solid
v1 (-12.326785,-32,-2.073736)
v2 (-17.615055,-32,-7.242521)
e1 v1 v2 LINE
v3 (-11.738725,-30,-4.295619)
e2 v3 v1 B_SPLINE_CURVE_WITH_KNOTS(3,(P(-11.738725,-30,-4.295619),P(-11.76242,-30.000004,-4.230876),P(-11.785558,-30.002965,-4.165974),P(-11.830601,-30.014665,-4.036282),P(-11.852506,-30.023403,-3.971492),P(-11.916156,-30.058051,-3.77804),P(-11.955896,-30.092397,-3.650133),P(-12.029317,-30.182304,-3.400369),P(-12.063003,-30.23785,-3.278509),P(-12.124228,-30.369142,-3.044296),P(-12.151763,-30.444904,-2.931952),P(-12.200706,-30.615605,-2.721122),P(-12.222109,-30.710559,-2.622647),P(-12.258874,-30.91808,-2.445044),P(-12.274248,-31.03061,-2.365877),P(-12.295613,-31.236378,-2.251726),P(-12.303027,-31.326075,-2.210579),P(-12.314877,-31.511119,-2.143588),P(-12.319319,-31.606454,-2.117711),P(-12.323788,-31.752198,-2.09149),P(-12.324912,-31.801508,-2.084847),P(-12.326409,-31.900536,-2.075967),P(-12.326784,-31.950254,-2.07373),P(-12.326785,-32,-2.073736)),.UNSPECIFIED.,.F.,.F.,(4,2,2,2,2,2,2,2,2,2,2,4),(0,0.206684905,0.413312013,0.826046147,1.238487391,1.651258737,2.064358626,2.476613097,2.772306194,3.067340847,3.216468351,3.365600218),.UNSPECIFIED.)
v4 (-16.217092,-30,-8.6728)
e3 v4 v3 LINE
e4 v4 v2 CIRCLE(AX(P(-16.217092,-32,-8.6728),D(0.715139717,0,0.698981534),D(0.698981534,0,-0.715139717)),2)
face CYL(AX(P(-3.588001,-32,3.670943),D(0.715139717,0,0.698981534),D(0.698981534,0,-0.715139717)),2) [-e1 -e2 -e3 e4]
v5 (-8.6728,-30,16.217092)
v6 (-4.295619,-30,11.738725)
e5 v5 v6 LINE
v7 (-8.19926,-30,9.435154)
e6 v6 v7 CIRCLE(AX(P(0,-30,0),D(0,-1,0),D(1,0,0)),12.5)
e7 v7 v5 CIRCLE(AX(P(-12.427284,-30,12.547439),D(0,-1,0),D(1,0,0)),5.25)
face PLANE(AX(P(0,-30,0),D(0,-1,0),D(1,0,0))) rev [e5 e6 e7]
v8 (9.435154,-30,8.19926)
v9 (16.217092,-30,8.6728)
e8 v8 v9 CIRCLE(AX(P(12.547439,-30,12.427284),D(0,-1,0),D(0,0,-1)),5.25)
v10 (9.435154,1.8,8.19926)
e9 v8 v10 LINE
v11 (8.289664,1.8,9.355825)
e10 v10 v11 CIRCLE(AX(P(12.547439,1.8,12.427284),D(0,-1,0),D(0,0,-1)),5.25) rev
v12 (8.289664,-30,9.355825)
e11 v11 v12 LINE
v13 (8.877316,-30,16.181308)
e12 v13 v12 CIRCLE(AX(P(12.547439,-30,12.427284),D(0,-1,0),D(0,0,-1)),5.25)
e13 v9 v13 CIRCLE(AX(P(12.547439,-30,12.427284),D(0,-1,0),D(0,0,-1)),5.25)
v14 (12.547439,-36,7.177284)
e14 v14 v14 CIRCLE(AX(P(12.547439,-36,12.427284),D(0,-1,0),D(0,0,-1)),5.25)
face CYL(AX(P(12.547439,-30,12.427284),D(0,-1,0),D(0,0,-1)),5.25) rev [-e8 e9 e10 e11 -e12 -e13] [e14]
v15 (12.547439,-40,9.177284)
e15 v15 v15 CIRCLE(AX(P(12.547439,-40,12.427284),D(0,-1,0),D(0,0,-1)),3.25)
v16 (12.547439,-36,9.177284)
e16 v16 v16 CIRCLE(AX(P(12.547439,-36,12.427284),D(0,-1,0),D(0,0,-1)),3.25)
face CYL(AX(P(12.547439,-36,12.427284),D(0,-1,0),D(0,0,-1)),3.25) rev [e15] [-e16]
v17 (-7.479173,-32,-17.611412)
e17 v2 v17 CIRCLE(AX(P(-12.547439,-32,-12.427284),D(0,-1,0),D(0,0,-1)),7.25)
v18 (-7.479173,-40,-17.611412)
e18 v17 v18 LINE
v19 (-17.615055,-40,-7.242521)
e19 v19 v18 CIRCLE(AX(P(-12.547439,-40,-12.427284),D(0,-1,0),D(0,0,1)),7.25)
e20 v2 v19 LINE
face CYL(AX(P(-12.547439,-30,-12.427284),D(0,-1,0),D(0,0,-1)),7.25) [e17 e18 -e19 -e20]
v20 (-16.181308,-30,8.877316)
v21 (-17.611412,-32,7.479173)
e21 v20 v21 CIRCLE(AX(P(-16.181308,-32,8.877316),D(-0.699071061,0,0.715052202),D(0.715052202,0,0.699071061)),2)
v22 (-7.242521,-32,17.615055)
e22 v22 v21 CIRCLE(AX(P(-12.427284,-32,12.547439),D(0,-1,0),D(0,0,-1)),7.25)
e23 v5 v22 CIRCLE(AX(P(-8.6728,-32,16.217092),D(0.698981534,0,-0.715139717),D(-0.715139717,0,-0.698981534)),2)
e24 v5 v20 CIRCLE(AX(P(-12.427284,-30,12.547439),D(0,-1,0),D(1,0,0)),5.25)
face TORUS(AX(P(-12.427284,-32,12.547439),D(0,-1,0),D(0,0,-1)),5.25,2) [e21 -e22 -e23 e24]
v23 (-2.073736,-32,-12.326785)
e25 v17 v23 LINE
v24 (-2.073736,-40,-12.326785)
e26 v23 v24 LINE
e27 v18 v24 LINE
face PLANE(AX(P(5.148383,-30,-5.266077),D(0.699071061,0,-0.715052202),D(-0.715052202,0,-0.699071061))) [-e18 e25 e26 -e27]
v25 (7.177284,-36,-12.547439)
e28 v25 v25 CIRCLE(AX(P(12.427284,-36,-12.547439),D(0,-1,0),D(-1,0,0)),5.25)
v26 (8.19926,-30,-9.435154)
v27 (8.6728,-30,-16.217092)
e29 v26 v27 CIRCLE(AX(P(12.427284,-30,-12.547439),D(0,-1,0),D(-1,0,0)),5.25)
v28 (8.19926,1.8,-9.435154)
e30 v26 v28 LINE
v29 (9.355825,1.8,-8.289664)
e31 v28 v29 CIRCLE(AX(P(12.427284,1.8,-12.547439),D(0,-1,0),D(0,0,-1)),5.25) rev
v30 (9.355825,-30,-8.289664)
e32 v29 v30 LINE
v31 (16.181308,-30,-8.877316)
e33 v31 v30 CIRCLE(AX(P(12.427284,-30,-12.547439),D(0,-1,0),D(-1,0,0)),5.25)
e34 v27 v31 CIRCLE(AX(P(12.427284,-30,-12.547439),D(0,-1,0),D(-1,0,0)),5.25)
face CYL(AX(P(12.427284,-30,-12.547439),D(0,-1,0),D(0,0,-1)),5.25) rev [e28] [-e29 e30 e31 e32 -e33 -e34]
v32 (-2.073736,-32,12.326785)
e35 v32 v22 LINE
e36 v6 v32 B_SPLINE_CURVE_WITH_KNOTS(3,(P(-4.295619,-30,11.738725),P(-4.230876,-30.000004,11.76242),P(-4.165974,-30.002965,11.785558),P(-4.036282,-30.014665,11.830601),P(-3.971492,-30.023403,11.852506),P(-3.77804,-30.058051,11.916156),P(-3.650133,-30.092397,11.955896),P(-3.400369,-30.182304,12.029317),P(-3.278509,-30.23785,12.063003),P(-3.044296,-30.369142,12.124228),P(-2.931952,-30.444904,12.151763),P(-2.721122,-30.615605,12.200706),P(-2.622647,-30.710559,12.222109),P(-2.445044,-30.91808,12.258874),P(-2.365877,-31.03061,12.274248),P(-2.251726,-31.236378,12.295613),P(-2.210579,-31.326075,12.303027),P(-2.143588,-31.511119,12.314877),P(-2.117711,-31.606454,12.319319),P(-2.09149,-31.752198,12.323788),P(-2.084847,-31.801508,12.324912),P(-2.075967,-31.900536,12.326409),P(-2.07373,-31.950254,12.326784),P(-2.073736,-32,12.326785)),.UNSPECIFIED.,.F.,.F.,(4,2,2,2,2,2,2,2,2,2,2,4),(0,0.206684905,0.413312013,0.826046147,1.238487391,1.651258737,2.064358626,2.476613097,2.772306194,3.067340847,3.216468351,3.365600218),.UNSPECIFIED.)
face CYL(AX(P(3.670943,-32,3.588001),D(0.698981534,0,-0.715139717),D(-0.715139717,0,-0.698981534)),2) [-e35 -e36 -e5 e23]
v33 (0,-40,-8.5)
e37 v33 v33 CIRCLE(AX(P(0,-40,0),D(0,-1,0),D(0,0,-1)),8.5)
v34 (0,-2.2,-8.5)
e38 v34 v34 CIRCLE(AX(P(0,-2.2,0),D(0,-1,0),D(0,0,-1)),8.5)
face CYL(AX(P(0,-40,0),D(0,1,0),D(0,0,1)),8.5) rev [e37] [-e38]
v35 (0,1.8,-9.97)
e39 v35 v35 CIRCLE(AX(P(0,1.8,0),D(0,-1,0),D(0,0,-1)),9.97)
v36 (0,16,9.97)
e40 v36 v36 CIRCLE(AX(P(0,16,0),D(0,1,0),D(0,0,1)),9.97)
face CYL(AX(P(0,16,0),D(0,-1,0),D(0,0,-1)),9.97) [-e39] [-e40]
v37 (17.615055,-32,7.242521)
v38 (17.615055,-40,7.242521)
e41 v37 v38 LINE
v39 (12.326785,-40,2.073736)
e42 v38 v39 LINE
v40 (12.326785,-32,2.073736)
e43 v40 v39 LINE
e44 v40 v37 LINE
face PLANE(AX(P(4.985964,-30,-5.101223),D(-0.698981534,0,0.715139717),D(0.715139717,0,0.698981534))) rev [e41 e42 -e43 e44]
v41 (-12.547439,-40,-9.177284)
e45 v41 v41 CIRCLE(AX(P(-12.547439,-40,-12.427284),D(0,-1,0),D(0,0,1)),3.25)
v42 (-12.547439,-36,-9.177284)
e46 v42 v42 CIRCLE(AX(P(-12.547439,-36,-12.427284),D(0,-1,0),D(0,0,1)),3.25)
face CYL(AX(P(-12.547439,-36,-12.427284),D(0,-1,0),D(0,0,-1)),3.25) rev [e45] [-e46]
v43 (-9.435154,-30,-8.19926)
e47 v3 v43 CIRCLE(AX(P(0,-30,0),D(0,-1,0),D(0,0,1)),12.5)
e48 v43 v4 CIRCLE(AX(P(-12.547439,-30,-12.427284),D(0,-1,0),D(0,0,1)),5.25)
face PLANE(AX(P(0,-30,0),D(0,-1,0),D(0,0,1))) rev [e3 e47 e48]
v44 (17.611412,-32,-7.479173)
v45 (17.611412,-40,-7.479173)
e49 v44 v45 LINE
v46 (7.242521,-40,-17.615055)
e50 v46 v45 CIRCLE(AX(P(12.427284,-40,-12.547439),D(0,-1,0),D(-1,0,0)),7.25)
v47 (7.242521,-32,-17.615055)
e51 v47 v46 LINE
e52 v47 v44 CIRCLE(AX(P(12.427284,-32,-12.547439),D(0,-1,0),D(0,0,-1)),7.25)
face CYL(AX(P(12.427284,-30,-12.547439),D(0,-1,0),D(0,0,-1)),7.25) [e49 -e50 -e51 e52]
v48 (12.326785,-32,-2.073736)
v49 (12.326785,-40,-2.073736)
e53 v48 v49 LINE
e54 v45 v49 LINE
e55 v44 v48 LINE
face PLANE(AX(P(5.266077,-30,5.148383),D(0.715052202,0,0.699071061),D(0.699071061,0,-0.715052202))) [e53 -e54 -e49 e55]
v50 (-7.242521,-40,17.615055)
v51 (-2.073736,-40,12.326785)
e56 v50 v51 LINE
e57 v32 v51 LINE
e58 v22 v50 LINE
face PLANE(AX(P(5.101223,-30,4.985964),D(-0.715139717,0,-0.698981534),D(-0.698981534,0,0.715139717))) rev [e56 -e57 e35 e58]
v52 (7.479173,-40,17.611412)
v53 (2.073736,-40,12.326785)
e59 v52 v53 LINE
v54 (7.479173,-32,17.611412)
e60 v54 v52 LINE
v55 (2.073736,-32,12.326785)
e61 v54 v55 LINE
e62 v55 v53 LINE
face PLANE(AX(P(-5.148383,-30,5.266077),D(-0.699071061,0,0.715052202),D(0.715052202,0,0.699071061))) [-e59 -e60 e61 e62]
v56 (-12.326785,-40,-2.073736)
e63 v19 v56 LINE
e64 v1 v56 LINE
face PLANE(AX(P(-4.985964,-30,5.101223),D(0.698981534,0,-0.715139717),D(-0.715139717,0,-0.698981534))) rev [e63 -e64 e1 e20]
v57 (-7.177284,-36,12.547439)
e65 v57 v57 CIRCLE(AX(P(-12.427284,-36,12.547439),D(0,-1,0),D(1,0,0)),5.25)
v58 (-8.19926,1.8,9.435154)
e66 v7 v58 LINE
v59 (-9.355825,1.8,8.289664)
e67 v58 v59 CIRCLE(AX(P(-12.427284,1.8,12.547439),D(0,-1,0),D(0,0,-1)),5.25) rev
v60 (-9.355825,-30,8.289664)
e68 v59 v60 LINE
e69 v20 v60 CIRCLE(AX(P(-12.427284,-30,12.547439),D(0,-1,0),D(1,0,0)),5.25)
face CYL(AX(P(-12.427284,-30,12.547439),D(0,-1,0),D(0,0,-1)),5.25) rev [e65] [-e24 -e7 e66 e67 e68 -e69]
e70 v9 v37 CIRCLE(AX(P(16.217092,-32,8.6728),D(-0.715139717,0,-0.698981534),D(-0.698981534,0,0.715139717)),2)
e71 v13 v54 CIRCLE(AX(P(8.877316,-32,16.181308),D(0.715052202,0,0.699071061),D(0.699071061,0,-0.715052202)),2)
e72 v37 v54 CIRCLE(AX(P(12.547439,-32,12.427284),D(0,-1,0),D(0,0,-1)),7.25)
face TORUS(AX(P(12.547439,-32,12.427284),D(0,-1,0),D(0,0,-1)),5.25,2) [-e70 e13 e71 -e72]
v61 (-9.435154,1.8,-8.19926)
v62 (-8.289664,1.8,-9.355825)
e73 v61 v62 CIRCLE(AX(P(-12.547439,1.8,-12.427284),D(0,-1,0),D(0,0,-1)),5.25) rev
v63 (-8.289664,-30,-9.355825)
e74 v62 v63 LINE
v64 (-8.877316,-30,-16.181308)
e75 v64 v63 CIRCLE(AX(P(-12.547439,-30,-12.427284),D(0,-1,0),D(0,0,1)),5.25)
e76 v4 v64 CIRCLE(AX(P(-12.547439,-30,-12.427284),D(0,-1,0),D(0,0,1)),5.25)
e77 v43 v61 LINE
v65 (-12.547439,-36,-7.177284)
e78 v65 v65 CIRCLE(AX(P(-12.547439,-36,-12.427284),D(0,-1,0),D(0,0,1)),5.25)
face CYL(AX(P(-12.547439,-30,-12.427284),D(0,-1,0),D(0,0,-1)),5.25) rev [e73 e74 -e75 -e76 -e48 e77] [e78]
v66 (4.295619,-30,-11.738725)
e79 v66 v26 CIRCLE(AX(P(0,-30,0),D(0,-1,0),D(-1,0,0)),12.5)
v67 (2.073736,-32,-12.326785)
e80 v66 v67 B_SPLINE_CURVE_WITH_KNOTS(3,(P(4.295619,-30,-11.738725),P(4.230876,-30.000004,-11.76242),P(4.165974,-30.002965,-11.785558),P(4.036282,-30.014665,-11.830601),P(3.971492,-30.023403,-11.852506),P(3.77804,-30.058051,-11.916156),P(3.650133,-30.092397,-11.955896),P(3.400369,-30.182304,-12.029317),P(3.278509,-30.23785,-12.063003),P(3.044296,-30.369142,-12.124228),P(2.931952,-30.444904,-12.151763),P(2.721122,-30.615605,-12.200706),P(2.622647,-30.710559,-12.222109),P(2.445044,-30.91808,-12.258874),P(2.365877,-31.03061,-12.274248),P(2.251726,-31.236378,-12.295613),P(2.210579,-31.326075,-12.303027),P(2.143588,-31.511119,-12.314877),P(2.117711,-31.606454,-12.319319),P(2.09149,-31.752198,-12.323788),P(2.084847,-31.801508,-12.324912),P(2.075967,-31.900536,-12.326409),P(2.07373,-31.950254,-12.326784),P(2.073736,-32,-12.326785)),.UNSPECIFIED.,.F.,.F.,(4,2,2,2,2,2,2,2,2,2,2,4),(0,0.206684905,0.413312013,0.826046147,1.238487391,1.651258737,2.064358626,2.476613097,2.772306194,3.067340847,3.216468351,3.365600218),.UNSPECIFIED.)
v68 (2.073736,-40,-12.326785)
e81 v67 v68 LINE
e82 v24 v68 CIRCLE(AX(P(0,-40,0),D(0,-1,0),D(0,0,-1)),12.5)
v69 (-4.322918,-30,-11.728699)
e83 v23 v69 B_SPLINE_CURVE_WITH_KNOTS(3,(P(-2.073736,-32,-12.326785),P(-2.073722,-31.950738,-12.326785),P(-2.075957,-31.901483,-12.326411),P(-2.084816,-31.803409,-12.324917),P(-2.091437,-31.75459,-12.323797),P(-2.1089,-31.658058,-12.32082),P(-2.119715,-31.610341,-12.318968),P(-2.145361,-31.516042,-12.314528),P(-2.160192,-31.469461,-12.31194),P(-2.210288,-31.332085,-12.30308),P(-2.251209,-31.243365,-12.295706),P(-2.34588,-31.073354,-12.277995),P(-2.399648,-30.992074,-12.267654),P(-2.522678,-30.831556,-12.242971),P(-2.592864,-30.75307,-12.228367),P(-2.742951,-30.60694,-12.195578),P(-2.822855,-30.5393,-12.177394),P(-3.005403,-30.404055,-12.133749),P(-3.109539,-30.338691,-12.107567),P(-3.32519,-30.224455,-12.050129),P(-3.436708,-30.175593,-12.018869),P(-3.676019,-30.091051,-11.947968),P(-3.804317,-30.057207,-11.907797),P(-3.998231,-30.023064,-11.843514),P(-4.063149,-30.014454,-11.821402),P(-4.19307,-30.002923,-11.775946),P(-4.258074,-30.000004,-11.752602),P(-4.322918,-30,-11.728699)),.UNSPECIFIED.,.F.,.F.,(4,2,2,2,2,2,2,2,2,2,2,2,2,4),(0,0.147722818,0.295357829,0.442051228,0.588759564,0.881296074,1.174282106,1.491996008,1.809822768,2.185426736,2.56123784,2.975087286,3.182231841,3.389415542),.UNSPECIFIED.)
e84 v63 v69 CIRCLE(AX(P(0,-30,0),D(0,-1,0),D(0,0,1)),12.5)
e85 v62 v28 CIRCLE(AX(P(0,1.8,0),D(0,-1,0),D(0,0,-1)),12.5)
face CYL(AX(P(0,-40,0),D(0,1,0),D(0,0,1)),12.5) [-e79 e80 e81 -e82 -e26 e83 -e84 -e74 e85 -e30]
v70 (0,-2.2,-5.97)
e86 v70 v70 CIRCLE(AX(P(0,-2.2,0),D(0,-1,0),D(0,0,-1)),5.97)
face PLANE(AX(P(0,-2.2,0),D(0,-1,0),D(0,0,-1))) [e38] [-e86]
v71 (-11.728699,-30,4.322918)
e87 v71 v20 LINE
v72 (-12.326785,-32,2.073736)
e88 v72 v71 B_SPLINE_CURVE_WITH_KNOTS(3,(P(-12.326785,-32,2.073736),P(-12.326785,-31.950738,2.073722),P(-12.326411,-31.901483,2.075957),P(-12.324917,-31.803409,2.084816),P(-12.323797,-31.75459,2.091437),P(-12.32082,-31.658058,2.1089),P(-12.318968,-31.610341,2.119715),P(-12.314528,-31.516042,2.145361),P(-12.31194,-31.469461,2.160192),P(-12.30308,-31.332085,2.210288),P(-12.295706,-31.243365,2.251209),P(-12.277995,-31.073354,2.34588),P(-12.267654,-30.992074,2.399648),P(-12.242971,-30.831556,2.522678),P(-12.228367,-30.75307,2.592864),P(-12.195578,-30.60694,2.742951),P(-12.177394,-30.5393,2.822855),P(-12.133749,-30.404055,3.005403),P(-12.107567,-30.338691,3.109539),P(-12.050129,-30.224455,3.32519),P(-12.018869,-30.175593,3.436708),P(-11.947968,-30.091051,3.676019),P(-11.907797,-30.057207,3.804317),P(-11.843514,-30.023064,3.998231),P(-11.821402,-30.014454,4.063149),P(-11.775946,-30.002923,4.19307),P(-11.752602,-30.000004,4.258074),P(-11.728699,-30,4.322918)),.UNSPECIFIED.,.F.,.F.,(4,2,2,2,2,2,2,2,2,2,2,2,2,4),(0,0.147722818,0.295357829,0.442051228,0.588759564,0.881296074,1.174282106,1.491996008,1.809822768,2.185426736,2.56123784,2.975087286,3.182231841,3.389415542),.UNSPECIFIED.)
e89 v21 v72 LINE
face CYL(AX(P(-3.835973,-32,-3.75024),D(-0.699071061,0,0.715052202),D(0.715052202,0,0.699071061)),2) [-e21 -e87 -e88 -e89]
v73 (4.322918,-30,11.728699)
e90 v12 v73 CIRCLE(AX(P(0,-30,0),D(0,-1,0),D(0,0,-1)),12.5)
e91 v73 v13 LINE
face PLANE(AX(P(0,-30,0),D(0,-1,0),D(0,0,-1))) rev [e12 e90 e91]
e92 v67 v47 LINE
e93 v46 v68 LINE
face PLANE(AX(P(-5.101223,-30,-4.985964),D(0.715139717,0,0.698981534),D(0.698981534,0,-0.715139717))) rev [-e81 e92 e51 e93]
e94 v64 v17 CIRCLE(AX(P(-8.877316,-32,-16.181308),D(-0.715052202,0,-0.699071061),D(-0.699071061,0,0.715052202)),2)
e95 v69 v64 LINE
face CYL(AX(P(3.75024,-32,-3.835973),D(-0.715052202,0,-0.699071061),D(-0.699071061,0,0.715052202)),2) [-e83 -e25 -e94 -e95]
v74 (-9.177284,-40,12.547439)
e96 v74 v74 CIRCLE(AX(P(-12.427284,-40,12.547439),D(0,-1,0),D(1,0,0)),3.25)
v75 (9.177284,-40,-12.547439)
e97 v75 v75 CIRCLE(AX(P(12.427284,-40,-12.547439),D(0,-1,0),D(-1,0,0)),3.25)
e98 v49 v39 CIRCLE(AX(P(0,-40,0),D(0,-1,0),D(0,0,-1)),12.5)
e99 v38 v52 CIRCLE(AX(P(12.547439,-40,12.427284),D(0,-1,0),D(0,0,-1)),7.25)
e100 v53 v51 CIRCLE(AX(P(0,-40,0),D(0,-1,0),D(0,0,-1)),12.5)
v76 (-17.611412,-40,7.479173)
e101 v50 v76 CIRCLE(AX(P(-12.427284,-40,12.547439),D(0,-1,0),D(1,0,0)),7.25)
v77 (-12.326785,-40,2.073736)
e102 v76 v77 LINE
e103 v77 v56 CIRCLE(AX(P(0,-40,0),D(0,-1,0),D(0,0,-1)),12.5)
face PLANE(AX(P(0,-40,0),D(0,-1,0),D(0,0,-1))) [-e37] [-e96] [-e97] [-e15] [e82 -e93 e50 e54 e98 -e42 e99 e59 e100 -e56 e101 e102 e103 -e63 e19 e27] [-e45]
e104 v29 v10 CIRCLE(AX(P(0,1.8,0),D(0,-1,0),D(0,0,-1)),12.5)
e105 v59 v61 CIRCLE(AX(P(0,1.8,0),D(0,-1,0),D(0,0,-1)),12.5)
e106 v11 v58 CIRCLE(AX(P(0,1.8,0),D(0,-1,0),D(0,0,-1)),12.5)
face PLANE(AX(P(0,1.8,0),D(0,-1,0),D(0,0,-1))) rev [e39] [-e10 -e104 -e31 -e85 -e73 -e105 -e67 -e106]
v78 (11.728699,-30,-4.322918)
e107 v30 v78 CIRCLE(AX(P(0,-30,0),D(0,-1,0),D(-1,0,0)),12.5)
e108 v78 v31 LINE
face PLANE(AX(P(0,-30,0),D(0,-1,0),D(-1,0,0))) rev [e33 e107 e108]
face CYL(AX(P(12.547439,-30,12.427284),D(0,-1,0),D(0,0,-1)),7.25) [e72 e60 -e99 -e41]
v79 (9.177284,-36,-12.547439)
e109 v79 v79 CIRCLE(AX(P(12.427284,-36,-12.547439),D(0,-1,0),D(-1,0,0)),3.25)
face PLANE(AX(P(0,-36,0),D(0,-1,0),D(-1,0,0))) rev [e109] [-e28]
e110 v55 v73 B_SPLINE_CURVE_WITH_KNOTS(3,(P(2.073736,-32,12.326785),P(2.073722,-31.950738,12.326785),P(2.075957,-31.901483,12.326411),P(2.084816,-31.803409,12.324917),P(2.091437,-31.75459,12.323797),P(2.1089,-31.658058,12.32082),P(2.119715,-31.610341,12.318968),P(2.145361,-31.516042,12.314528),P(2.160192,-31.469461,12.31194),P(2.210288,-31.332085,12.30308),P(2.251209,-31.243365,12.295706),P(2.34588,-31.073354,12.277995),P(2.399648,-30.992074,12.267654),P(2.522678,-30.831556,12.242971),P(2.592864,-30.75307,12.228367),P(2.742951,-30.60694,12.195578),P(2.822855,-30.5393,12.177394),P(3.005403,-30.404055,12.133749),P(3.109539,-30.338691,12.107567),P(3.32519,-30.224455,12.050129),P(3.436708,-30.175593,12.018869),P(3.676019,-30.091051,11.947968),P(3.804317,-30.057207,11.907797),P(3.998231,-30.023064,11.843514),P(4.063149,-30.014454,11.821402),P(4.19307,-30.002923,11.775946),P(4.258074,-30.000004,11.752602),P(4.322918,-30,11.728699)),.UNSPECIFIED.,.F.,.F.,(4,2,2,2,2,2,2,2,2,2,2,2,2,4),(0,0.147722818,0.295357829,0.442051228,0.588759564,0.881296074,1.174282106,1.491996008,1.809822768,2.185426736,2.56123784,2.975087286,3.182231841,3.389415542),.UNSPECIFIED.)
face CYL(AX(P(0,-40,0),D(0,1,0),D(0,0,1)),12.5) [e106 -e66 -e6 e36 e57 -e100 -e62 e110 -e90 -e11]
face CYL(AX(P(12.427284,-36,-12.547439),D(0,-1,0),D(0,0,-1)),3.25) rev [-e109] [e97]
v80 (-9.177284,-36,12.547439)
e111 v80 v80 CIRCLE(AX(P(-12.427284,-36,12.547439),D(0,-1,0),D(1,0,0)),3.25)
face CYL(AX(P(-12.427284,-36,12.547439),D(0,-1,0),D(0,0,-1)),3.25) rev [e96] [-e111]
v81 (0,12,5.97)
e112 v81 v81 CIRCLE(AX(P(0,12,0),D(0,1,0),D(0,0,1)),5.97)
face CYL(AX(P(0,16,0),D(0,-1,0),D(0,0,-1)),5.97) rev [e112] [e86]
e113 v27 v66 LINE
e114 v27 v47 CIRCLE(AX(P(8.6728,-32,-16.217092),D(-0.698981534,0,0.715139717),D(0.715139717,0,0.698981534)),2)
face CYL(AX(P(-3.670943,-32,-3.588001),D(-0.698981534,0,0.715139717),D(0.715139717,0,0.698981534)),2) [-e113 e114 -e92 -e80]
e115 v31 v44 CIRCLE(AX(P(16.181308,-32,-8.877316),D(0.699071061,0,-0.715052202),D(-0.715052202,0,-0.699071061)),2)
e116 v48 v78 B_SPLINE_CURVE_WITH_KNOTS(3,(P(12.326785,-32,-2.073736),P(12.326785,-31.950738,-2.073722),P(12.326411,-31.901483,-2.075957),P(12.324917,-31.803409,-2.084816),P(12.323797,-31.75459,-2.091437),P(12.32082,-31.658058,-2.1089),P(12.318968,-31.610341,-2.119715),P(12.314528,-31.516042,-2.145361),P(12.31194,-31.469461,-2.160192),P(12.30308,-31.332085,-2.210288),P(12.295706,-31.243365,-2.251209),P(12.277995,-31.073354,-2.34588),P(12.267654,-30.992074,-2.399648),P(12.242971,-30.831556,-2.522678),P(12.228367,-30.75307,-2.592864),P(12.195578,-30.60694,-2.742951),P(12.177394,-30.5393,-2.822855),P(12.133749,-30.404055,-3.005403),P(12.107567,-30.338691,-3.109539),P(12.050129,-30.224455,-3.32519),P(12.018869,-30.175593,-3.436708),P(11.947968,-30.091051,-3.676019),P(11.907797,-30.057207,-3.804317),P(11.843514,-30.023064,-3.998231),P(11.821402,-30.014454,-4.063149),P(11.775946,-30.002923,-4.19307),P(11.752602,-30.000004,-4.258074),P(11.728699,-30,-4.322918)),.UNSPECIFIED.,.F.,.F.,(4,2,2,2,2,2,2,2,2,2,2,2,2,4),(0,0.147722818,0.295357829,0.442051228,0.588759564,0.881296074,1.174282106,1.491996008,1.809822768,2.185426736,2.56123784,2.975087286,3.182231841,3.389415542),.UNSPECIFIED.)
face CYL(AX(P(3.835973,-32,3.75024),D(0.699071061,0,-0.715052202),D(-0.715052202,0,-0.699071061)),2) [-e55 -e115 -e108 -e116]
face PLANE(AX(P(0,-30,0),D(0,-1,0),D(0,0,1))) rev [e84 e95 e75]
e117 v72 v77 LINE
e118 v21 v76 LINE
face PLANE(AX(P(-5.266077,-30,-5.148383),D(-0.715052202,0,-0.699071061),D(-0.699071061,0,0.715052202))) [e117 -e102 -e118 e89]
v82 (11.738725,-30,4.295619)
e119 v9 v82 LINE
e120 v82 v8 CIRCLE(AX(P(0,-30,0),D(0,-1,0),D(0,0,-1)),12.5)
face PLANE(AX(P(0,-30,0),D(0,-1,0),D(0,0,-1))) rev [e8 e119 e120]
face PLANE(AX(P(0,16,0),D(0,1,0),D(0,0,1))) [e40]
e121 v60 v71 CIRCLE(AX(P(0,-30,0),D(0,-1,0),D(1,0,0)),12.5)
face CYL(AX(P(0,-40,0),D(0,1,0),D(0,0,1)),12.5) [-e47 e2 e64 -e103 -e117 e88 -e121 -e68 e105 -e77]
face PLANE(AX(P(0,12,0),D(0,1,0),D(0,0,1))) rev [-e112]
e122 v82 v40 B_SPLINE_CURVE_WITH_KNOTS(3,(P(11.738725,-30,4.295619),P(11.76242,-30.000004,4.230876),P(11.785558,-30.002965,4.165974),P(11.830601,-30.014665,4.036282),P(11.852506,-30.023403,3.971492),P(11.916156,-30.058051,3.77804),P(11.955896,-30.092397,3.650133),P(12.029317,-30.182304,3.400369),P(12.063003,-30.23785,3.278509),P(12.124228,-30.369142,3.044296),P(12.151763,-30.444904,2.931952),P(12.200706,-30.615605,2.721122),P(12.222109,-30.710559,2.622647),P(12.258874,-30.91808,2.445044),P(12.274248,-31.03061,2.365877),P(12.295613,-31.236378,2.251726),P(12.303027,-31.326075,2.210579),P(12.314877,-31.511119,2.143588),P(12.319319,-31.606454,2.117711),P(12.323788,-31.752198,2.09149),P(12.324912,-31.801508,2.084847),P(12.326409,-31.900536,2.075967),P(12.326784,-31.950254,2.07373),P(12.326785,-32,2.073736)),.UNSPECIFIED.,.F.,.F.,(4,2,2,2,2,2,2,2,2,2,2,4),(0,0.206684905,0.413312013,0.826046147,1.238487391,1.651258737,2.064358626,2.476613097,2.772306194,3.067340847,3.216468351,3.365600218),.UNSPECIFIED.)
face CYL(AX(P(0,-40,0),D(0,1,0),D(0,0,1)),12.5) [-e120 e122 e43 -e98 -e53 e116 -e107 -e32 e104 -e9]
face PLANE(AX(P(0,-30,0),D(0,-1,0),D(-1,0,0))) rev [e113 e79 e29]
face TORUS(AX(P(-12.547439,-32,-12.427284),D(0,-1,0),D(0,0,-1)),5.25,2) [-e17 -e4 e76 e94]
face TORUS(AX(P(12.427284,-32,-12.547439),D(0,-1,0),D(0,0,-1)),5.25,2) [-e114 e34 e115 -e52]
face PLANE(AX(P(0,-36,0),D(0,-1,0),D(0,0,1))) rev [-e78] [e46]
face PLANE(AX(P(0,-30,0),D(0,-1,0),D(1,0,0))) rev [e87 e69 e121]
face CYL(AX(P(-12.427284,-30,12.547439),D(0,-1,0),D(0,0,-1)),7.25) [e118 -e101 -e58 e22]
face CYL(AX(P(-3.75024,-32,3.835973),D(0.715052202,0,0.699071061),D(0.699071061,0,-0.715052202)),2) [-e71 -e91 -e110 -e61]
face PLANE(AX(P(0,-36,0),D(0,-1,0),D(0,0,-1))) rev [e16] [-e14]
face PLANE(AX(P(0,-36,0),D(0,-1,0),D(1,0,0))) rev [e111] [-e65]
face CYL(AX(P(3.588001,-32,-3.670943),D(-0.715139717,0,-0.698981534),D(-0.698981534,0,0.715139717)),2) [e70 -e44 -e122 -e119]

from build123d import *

# Parameters (mm, degrees)
SKETCH1_R                = 9.97
BOSS_EXTRUDE1_DEPTH      = 16
BOSS_EXTRUDE2_DEPTH      = 40
BOSS_EXTRUDE2_DEPTH_BACK = 1.8
SKETCH3_R                = 12.5
SHELL2_T                 = -4
BOSS_EXTRUDE3_DEPTH      = 10
SKETCH5_3_R              = 3.25
BOSS_EXTRUDE4_DEPTH      = 4
SKETCH7_R                = 5.25
CUT_EXTRUDE3_DEPTH       = 52
CIRPATTERN1_COUNT        = 4
FILLET1_R                = 2


with BuildPart() as part:
    # Sketch1 → Boss-Extrude1 (new body)
    with BuildSketch(Plane(origin=(0, 0, 0), x_dir=(1, 0, 0), z_dir=(0, 1, 0))):
        with Locations(Location((0, 0, 0), (0, 0, 270))):
            Circle(SKETCH1_R)
    extrude(amount=BOSS_EXTRUDE1_DEPTH)

    # Sketch3 → Boss-Extrude2 (add, two sides: drawn at the far end of the back side and taken through both)
    with BuildSketch(Plane.XZ.offset(-BOSS_EXTRUDE2_DEPTH_BACK)):
        with Locations(Location((0, 0, 0), (0, 0, 270))):
            Circle(SKETCH3_R)
    extrude(amount=BOSS_EXTRUDE2_DEPTH + BOSS_EXTRUDE2_DEPTH_BACK)

    # Shell2
    shell2_openings = [part.faces().sort_by_distance(p)[0] for p in [
        (0, -40, 0),
    ]]
    offset(amount=SHELL2_T, openings=shell2_openings, kind=Kind.INTERSECTION)

    # Sketch5 → Boss-Extrude3 (add)
    with BuildSketch(Plane.XZ.offset(40)):
        with BuildLine():
            Line((12.326784576, 2.073736248), (17.615054746, 7.242520906))
            ThreePointArc((17.615054746, 7.242520906), (17.731884341, 17.495224521), (7.479173432, 17.61141232))
            Line((7.479173432, 17.61141232), (2.073736248, 12.326784576))
            ThreePointArc((2.073736248, 12.326784576), (5.390423742, 11.278002123), (8.289664381, 9.355825161))
            ThreePointArc((8.289664381, 9.355825161), (10.933563593, 17.423072819), (17.797438623, 12.427283854))
            ThreePointArc((17.797438623, 12.427283854), (14.916299872, 7.74209481), (9.435154287, 8.199259941))
            ThreePointArc((9.435154287, 8.199259941), (11.30380493, 5.336102895), (12.326784576, 2.073736248))
        make_face()
    boss_extrude3 = extrude(amount=-BOSS_EXTRUDE3_DEPTH)

    # Sketch5<3> → Boss-Extrude4 (add)
    with BuildSketch(Plane.XZ.offset(40)):
        with BuildLine():
            ThreePointArc((8.289664381, 9.355825161), (8.881256104, 8.796208844), (9.435154287, 8.199259941))
            ThreePointArc((9.435154287, 8.199259941), (14.916299872, 7.74209481), (17.797438623, 12.427283854))
            ThreePointArc((17.797438623, 12.427283854), (10.933563593, 17.423072819), (8.289664381, 9.355825161))
        make_face()
        with Locations(Location((12.547438623, 12.427283854, 0), (0, 0, 270))):
            Circle(SKETCH5_3_R, mode=Mode.SUBTRACT)
    boss_extrude4 = extrude(amount=-BOSS_EXTRUDE4_DEPTH)

    # Sketch7 → Cut-Extrude3 (cut)
    with BuildSketch(Plane(origin=(0, -36, 0), x_dir=(1, 0, 0), z_dir=(0, 1, 0))):
        with Locations(Location((12.547438623, -12.427283854, 0), (0, 0, 90))):
            Circle(SKETCH7_R)
    cut_extrude3 = extrude(amount=CUT_EXTRUDE3_DEPTH, mode=Mode.SUBTRACT)

    # CirPattern1: Boss-Extrude3, Boss-Extrude4, Cut-Extrude3 ×4 about axis
    cirpattern1_axis = Axis((0, 0, 0), (0, 1, 0))
    add([boss_extrude3.rotate(cirpattern1_axis, i * 360 / CIRPATTERN1_COUNT) for i in range(1, CIRPATTERN1_COUNT)])
    add([boss_extrude4.rotate(cirpattern1_axis, i * 360 / CIRPATTERN1_COUNT) for i in range(1, CIRPATTERN1_COUNT)])
    add([cut_extrude3.rotate(cirpattern1_axis, i * 360 / CIRPATTERN1_COUNT) for i in range(1, CIRPATTERN1_COUNT)], mode=Mode.SUBTRACT)

    # Fillet1
    fillet1_edges = [part.edges().sort_by_distance(p)[0] for p in [
        (14.969098448, -30, -4.77645484),
        (17.495224521, -30, -17.731884341),
        (4.658128577, -30, -14.970919661),
        (4.77645484, -30, 14.969098448),
        (17.731884341, -30, 17.495224521),
        (14.970919661, -30, 4.658128577),
        (-14.969098448, -30, 4.77645484),
        (-17.495224521, -30, 17.731884341),
        (-4.658128577, -30, 14.970919661),
        (-4.77645484, -30, -14.969098448),
        (-17.731884341, -30, -17.495224521),
        (-14.970919661, -30, -4.658128577),
    ]]
    fillet(fillet1_edges, radius=FILLET1_R - 0.0001)  # a hair under: the kernel refuses the full size


solid = part.part
